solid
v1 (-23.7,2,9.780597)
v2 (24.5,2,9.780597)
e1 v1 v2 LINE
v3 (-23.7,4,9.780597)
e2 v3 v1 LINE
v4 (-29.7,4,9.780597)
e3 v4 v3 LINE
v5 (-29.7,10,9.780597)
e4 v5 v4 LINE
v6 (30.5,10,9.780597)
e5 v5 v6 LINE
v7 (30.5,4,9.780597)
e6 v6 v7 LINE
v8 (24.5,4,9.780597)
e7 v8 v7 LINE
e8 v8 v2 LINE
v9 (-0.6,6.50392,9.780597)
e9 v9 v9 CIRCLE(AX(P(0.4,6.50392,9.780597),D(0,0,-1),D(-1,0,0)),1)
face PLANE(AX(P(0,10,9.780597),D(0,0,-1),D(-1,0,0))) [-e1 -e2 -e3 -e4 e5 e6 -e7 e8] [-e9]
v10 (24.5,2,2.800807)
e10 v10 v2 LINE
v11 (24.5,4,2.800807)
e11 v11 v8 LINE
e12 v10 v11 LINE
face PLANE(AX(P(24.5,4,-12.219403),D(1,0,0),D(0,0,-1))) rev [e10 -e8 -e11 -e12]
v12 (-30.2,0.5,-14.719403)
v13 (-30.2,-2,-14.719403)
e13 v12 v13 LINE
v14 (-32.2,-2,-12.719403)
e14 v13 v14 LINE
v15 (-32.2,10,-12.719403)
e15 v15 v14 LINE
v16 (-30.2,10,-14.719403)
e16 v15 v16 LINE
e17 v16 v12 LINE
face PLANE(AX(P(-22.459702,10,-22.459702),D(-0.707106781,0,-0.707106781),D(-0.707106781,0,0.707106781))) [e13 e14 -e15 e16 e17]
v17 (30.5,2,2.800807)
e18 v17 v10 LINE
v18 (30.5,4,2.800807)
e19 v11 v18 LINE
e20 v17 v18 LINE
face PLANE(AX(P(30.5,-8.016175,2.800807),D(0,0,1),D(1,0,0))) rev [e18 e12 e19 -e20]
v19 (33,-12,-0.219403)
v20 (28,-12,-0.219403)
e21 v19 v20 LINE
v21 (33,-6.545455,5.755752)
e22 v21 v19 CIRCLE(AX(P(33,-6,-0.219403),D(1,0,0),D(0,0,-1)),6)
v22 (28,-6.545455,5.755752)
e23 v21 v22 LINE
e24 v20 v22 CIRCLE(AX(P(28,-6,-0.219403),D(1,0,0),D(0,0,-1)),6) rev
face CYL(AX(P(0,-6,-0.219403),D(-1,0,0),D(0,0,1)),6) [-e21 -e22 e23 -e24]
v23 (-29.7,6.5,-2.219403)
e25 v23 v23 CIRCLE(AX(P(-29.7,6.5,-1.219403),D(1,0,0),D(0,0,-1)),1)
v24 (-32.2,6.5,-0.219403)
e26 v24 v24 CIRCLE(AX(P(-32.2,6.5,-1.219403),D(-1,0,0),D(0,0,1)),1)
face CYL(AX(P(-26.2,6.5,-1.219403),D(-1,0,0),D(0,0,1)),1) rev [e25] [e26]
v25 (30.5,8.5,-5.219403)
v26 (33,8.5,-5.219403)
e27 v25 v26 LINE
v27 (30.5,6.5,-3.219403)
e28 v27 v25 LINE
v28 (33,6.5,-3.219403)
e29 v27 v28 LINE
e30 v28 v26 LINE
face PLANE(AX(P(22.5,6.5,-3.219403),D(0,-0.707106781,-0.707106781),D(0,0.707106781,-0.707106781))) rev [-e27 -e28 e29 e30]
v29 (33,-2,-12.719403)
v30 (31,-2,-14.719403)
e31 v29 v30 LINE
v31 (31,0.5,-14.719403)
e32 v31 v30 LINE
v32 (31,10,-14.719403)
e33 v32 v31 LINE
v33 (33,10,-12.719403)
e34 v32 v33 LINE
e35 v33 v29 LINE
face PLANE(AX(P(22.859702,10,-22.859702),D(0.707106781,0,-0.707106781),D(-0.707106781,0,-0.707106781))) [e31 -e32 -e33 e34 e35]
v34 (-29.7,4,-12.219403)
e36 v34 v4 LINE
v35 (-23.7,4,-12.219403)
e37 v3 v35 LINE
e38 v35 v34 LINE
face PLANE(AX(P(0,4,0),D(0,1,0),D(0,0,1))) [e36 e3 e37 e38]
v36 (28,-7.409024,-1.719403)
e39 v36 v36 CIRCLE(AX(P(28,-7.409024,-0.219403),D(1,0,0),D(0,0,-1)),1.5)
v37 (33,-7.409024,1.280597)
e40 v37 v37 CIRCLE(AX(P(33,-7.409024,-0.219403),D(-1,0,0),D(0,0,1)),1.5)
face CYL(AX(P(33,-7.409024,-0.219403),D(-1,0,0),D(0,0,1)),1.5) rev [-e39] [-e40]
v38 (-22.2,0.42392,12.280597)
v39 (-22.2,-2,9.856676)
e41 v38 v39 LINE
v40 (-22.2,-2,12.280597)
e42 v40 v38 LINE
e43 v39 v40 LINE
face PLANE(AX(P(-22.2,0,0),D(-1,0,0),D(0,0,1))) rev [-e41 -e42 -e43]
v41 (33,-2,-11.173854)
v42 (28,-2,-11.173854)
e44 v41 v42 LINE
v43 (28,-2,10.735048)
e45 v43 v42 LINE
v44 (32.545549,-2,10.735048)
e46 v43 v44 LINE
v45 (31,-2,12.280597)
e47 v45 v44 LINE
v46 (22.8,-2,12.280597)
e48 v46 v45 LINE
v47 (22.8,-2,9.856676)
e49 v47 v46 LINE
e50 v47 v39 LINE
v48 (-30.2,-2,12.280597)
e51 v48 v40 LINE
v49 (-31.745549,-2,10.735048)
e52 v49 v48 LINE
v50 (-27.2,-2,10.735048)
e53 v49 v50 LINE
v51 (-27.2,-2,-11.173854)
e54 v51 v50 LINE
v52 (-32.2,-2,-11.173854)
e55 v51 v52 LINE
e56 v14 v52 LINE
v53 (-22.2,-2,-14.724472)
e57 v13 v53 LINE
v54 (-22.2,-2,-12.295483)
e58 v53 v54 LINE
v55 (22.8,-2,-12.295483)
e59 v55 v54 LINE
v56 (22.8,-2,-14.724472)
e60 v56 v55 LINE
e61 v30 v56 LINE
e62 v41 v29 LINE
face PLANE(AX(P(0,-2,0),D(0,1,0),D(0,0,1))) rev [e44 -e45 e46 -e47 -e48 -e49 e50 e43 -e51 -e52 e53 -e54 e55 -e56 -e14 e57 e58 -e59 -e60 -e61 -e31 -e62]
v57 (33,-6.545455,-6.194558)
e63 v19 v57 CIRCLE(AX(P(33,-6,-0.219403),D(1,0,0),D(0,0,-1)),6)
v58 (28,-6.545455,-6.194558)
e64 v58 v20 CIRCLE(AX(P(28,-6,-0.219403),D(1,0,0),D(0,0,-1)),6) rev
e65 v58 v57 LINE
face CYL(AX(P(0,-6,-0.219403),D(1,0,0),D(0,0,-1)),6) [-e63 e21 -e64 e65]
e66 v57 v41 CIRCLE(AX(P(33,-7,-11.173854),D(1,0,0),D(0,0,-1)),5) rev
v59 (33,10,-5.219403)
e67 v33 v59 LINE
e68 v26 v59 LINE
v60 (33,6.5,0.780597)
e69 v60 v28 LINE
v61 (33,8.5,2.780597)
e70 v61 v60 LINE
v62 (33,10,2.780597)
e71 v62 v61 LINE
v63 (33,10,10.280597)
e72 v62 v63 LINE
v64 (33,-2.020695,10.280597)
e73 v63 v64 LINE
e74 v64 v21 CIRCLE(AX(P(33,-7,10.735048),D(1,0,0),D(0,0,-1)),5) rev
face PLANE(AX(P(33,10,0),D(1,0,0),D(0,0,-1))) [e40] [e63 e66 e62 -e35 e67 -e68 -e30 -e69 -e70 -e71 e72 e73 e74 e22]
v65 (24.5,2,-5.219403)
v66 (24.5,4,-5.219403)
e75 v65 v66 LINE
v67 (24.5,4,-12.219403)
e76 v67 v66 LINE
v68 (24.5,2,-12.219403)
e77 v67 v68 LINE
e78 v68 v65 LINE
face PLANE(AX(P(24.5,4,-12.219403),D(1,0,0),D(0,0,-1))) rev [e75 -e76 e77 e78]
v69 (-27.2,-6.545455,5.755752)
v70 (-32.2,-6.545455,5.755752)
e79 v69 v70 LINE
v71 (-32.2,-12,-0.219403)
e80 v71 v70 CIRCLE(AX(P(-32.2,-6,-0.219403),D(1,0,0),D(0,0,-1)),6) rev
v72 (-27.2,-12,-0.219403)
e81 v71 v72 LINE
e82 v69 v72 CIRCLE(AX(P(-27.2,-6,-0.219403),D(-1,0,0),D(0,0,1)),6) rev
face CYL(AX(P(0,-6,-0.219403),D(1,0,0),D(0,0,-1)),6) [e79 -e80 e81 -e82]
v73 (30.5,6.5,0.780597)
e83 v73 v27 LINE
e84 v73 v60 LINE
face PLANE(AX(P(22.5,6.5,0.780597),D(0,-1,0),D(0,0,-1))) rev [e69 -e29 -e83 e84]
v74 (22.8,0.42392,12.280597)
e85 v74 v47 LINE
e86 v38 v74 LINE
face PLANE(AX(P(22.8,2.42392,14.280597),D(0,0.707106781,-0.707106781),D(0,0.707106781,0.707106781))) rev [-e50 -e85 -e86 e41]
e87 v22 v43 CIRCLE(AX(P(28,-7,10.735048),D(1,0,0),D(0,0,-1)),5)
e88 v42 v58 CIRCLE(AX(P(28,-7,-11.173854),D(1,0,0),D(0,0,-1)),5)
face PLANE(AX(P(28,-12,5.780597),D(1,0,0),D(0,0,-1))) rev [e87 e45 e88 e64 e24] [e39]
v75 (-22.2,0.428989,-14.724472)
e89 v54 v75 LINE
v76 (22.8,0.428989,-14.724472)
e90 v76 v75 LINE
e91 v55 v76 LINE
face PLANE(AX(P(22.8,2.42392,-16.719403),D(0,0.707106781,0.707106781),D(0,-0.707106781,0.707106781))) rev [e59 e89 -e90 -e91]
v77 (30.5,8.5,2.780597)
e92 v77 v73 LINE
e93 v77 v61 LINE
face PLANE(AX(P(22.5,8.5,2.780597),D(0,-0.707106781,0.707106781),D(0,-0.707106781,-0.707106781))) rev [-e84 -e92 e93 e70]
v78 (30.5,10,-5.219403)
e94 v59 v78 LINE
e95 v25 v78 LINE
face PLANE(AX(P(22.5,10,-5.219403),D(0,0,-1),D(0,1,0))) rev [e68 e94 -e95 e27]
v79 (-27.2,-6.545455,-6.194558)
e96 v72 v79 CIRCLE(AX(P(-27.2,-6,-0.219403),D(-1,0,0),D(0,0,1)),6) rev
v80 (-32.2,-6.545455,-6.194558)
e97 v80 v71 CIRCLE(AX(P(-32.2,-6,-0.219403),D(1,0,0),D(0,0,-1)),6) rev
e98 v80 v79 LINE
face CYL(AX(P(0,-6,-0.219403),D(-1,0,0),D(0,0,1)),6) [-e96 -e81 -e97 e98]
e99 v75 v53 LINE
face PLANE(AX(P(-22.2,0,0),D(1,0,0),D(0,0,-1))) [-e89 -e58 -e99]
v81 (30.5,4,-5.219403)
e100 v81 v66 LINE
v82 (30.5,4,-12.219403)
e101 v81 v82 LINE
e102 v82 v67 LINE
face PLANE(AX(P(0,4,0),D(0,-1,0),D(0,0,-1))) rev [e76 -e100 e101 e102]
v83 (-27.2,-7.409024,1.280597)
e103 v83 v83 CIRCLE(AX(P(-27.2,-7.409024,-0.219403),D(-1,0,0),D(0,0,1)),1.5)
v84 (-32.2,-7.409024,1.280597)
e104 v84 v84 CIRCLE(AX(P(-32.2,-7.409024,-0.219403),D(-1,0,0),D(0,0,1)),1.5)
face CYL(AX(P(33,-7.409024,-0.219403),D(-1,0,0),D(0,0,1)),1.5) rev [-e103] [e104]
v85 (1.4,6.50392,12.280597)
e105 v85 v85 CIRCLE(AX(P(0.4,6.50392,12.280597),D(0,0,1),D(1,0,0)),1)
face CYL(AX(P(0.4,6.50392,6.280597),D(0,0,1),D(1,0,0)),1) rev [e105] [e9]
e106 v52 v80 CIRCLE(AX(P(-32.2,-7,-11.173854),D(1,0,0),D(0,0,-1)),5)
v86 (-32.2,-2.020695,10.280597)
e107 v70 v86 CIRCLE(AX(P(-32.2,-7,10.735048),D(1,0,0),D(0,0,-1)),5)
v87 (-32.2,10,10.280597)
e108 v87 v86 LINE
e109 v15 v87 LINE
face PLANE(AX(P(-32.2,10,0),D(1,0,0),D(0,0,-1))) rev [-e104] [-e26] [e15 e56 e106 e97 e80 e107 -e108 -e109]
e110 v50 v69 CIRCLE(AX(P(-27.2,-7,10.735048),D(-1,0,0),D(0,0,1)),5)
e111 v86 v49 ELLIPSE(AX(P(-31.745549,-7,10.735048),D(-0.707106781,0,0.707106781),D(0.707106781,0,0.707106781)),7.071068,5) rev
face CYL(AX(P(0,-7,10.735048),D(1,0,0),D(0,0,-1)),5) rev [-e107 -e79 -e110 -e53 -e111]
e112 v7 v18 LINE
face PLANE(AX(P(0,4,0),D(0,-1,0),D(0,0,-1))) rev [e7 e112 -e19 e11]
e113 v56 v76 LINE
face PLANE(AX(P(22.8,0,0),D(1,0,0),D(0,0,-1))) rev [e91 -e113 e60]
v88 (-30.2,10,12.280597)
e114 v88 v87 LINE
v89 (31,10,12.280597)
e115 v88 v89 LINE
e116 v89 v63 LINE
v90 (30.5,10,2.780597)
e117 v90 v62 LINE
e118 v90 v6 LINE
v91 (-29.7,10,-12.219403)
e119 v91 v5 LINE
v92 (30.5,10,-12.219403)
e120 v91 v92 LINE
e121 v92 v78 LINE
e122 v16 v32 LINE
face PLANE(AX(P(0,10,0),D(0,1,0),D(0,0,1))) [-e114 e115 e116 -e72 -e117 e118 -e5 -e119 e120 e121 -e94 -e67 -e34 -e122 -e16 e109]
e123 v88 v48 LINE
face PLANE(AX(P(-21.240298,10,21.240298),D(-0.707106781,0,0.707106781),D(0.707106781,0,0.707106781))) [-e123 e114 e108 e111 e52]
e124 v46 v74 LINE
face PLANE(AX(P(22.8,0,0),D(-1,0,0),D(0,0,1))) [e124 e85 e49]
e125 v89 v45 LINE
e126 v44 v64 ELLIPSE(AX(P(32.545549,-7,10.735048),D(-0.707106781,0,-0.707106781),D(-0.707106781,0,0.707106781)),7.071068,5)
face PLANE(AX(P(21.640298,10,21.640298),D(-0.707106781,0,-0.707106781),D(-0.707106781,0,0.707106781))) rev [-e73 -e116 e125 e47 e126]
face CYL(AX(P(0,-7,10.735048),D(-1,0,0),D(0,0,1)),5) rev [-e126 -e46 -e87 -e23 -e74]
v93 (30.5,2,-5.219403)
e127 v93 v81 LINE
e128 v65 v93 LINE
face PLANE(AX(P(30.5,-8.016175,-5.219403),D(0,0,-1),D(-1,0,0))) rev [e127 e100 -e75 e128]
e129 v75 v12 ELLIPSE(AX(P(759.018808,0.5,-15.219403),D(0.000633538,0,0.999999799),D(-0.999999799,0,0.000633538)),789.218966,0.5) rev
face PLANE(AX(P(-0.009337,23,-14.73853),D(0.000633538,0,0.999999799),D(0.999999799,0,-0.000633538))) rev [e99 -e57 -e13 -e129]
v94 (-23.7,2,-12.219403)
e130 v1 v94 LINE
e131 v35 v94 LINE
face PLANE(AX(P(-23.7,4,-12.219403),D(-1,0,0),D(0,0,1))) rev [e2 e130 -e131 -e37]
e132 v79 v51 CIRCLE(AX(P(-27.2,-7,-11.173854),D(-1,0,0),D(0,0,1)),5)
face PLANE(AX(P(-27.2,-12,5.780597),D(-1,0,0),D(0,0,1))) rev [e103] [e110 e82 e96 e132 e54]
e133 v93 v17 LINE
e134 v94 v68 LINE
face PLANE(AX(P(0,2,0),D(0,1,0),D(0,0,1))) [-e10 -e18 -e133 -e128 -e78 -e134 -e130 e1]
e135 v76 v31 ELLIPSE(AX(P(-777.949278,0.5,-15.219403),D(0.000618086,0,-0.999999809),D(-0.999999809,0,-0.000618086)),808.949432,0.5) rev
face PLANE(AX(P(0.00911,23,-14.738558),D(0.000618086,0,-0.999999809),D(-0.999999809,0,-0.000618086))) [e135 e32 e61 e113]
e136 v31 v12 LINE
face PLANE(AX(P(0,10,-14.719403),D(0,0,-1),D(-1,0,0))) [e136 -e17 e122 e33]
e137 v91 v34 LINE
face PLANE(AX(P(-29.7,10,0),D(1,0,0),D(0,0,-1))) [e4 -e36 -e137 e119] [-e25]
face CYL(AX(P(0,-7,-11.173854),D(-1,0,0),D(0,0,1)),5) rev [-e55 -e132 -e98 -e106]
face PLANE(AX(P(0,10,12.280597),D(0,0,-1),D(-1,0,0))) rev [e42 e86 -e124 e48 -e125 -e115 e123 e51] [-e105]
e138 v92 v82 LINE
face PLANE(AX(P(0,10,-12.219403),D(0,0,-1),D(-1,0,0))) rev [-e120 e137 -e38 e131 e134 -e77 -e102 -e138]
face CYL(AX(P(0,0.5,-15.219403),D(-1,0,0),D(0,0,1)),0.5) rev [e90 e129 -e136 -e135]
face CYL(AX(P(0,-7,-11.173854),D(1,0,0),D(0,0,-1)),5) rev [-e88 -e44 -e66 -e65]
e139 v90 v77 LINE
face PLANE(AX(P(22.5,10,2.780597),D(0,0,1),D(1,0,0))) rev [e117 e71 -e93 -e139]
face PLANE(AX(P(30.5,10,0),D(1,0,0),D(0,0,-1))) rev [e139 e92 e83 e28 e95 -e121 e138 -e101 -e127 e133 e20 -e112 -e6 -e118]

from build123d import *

# Parameters (mm, degrees)
SKETCH1_W                = 60.2
SKETCH1_H                = 22
BOSS_EXTRUDE1_DEPTH      = 10
SKETCH1_3_W              = 60.2
SKETCH1_3_H              = 22
BOSS_EXTRUDE2_DEPTH      = 2
SKETCH2_W                = 6
SKETCH2_H                = 22
BOSS_EXTRUDE3_DEPTH      = 2
BOSS_EXTRUDE4_DEPTH      = 2
FILLET1_R                = 0.5
CUT_EXTRUDE1_DEPTH       = 10.5
SKETCH5_W                = 5
SKETCH5_H                = 9
BOSS_EXTRUDE5_DEPTH      = 5
SKETCH7_W                = 3.5
SKETCH7_H                = 5
SKETCH7_W_2              = 2.5
CUT_EXTRUDE3_DEPTH       = 5
CUT_EXTRUDE4_REACH       = 52.1
CUT_EXTRUDE5_REACH       = 52.1
SKETCH11_R               = 1.5
CUT_EXTRUDE6_START       = -10
CUT_EXTRUDE6_DEPTH       = 45
SKETCH13_W               = 6
SKETCH13_H               = 8.020209914
CUT_EXTRUDE7_DEPTH       = 2
SKETCH19_R               = 1
CUT_EXTRUDE9_DEPTH       = 6
SKETCH20_R               = 1
CUT_EXTRUDE10_DEPTH      = 6
CUT_EXTRUDE13_DEPTH      = 23
CUT_EXTRUDE13_DEPTH_BACK = 23
SKETCH24_W               = 5
SKETCH24_H               = 12
BOSS_EXTRUDE6_DEPTH      = 10
FILLET2_R                = 6
SKETCH25_R               = 1.5
CUT_EXTRUDE14_DEPTH      = 68.910603458
FILLET3_R                = 5


# Some blends are built 0.0001 mm under size
with BuildPart() as part:
    # Sketch1 → Boss-Extrude1 (new body)
    with BuildSketch(Plane(origin=(0, 0, 0), x_dir=(1, 0, 0), z_dir=(0, 1, 0))):
        Polygon((-30.2, 14.719403234), (31, 14.719403234), (33, 12.719403234), (33, -10.280596766), (31, -12.280596766), (-30.2, -12.280596766), (-32.2, -10.280596766), (-32.2, 12.719403234), align=None)
        with Locations((0.4, 1.219403234)):
            Rectangle(SKETCH1_W, SKETCH1_H, mode=Mode.SUBTRACT)
    extrude(amount=BOSS_EXTRUDE1_DEPTH)

    # Sketch1<3> → Boss-Extrude2 (add)
    # profile 1 of 2: a face of its own
    with BuildSketch(Plane(origin=(0, 0, 0), x_dir=(1, 0, 0), z_dir=(0, 1, 0))):
        with Locations((0.4, 1.219403234)):
            Rectangle(SKETCH1_3_W, SKETCH1_3_H)
        with BuildLine():
            Line((19, 11.719403234), (19, 4.719403234))
            ThreePointArc((19, 4.719403234), (21, 2.719403234), (23, 4.719403234))
            Line((23, 4.719403234), (23, 8.719403234))
            Line((23, 8.719403234), (27.74387368, 8.719403234))
            Line((27.74387368, 8.719403234), (29, 7.463276914))
            Line((29, 7.463276914), (29, -6.35040845))
            Line((29, -6.35040845), (21, -9.280596766))
            Line((21, -9.280596766), (-19, -9.280596766))
            Line((-19, -9.280596766), (-29, -3.280596766))
            Line((-29, -3.280596766), (-29, 6.719403234))
            Line((-29, 6.719403234), (-19, 11.719403234))
            Line((-19, 11.719403234), (-10, 11.719403234))
            Line((-10, 11.719403234), (-9.484452133, 10.971768721))
            ThreePointArc((-9.484452133, 10.971768721), (-9.305293031, 10.812937389), (-9.07282975, 10.755612013))
            Line((-9.07282975, 10.755612013), (-6.967125689, 10.755612013))
            ThreePointArc((-6.967125689, 10.755612013), (-6.742443017, 10.808937974), (-6.565686023, 10.957541226))
            Line((-6.565686023, 10.957541226), (-6, 11.719403234))
            Line((-6, 11.719403234), (19, 11.719403234))
        make_face(mode=Mode.SUBTRACT)
    # profile 2 of 2: a face of its own
    with BuildSketch(Plane(origin=(0, 0, 0), x_dir=(1, 0, 0), z_dir=(0, 1, 0))):
        with BuildLine():
            ThreePointArc((19, 4.719403234), (21, 2.719403234), (23, 4.719403234))
            Line((23, 4.719403234), (23, 8.719403234))
            Line((23, 8.719403234), (27.74387368, 8.719403234))
            Line((27.74387368, 8.719403234), (29, 7.463276914))
            Line((29, 7.463276914), (29, -6.35040845))
            Line((29, -6.35040845), (21, -9.280596766))
            Line((21, -9.280596766), (-19, -9.280596766))
            Line((-19, -9.280596766), (-29, -3.280596766))
            Line((-29, -3.280596766), (-29, 6.719403234))
            Line((-29, 6.719403234), (-19, 11.719403234))
            Line((-19, 11.719403234), (-10, 11.719403234))
            Line((-10, 11.719403234), (-9.484452133, 10.971768721))
            ThreePointArc((-9.484452133, 10.971768721), (-9.305293031, 10.812937389), (-9.07282975, 10.755612013))
            Line((-9.07282975, 10.755612013), (-6.967125689, 10.755612013))
            ThreePointArc((-6.967125689, 10.755612013), (-6.742443017, 10.808937974), (-6.565686023, 10.957541226))
            Line((-6.565686023, 10.957541226), (-6, 11.719403234))
            Line((-6, 11.719403234), (19, 11.719403234))
            Line((19, 11.719403234), (19, 4.719403234))
        make_face()
    extrude(amount=BOSS_EXTRUDE2_DEPTH)

    # Sketch2 → Boss-Extrude3 (add)
    with BuildSketch(Plane(origin=(0, 2, 0), x_dir=(1, 0, 0), z_dir=(0, 1, 0))):
        with Locations((-26.7, 1.219403234)):
            Rectangle(SKETCH2_W, SKETCH2_H)
        with Locations((27.5, 1.219403234)):
            Rectangle(SKETCH2_W, SKETCH2_H)
    extrude(amount=BOSS_EXTRUDE3_DEPTH)

    # Sketch3 → Boss-Extrude4 (add)
    with BuildSketch(Plane.XZ):
        Polygon((-32.2, 14.280596766), (36, 14.280596766), (41, 9.280596766), (41, -11.719403234), (36, -16.719403234), (-32.2, -16.719403234), (-37.2, -11.719403234), (-37.2, 9.280596766), align=None)
    extrude(amount=BOSS_EXTRUDE4_DEPTH)

    # Fillet1
    fillet1_edges = [part.edges().sort_by_distance(p)[0] for p in [
        (0.4, 0, -14.719403234),
        (32, 0, -13.719403234),
    ]]
    fillet(fillet1_edges, radius=FILLET1_R)

    # Sketch4 → Cut-Extrude1 (cut)
    with BuildSketch(Plane(origin=(33, 0, 0), x_dir=(0, 0, -1), z_dir=(1, 0, 0))):
        Polygon((-2.780596766, 10), (5.219403234, 10), (5.219403234, 8.5), (3.219403234, 6.5), (-0.780596766, 6.5), (-2.780596766, 8.5), align=None)
    extrude(amount=-CUT_EXTRUDE1_DEPTH, mode=Mode.SUBTRACT)

    # Sketch5 → Boss-Extrude5 (add)
    with BuildSketch(Plane(origin=(0, 0, 0), x_dir=(-1, 0, 0), z_dir=(0, 1, 0))):
        with Locations((-35.5, 9.280596766)):
            Rectangle(SKETCH5_W, SKETCH5_H)
        with Locations((-35.5, -9.719403234)):
            Rectangle(SKETCH5_W, SKETCH5_H)
    extrude(amount=BOSS_EXTRUDE5_DEPTH)

    # Sketch7 → Cut-Extrude3 (cut)
    with BuildSketch(Plane(origin=(38, 0, 0), x_dir=(0, 0, -1), z_dir=(1, 0, 0))):
        with Locations((-12.030596766, 2.5)):
            Rectangle(SKETCH7_W, SKETCH7_H)
        with Locations((13.969403234, 2.5)):
            Rectangle(SKETCH7_W_2, SKETCH7_H)
    extrude(amount=-CUT_EXTRUDE3_DEPTH, mode=Mode.SUBTRACT)

    # Sketch10 → Cut-Extrude4 (cut, up to next)
    with BuildSketch(Plane(origin=(0, 0, -12.719403234), x_dir=(-1, 0, 0), z_dir=(0, 0, -1)), mode=Mode.PRIVATE) as cut_extrude4_sk1:
        with BuildLine():
            Line((-35.5, 5), (-38, 5))
            Line((-38, 5), (-38, 2.5))
            ThreePointArc((-38, 2.5), (-37.267766953, 4.267766953), (-35.5, 5))
        make_face()
    cut_extrude4_tool1 = extrude(cut_extrude4_sk1.sketch, amount=-CUT_EXTRUDE4_REACH, mode=Mode.PRIVATE) & part.part
    # Sketch10 → Cut-Extrude4 (cut, up to next)
    with BuildSketch(Plane(origin=(0, 0, -12.719403234), x_dir=(-1, 0, 0), z_dir=(0, 0, -1)), mode=Mode.PRIVATE) as cut_extrude4_sk2:
        with BuildLine():
            ThreePointArc((-35.5, 0), (-37.267766953, 0.732233047), (-38, 2.5))
            Line((-38, 2.5), (-38, 0))
            Line((-38, 0), (-35.5, 0))
        make_face()
    cut_extrude4_tool2 = extrude(cut_extrude4_sk2.sketch, amount=-CUT_EXTRUDE4_REACH, mode=Mode.PRIVATE) & part.part
    add(cut_extrude4_tool1.solids().sort_by_distance((37.44158, 4.44158, -12.719403))[0], mode=Mode.SUBTRACT)
    add(cut_extrude4_tool1.solids().sort_by_distance((37.44158, 4.44158, -12.719403))[1], mode=Mode.SUBTRACT)
    add(cut_extrude4_tool2.solids().sort_by_distance((37.44158, 0.55842, -12.719403))[0], mode=Mode.SUBTRACT)
    add(cut_extrude4_tool2.solids().sort_by_distance((37.44158, 0.55842, -12.719403))[1], mode=Mode.SUBTRACT)

    # Cut-Extrude5: up to this face of the body (flat: up to its plane)
    cut_extrude5_end = Plane(part.part.faces().sort_by_distance((35.266625353, 2.5, 10.280596766))[0])
    # Sketch11 → Cut-Extrude5 (cut, up to the picked face)
    with BuildSketch(Plane(origin=(0, 0, -12.719403234), x_dir=(-1, 0, 0), z_dir=(0, 0, -1)), mode=Mode.PRIVATE) as cut_extrude5_sk1:
        with Locations((-35.5, 2.5)):
            Circle(SKETCH11_R)
    cut_extrude5_tool1 = split(extrude(cut_extrude5_sk1.sketch, amount=-CUT_EXTRUDE5_REACH, mode=Mode.PRIVATE), bisect_by=cut_extrude5_end, keep=Keep.BOTH, mode=Mode.PRIVATE)
    add(cut_extrude5_tool1.solids().sort_by(Axis((35.5, 2.5, -12.719403), (0, 0, 1)))[0], mode=Mode.SUBTRACT)

    # Sketch12 → Cut-Extrude6 (cut)
    with BuildSketch(Plane.ZY.offset(32.2).offset(CUT_EXTRUDE6_START)):
        Polygon((14.280596766, -2), (14.280596766, 2.423920323), (9.856676443, -2), align=None)
        Polygon((-12.295482911, -2), (-16.719403234, -2), (-16.719403234, 2.423920323), align=None)
    extrude(amount=-CUT_EXTRUDE6_DEPTH, mode=Mode.SUBTRACT)

    # Sketch13 → Cut-Extrude7 (cut)
    with BuildSketch(Plane(origin=(0, 4, 0), x_dir=(1, 0, 0), z_dir=(0, 1, 0))):
        with Locations((27.5, 1.209298277)):
            Rectangle(SKETCH13_W, SKETCH13_H)
    extrude(amount=-CUT_EXTRUDE7_DEPTH, mode=Mode.SUBTRACT)

    # Sketch19 → Cut-Extrude9 (cut)
    with BuildSketch(Plane.ZY.offset(32.2)):
        with Locations((-1.219403234, 6.5)):
            Circle(SKETCH19_R)
    extrude(amount=-CUT_EXTRUDE9_DEPTH, mode=Mode.SUBTRACT)

    # Sketch20 → Cut-Extrude10 (cut)
    with BuildSketch(Plane.XY.offset(12.280596766)):
        with Locations((0.4, 6.503920323)):
            Circle(SKETCH20_R)
    extrude(amount=-CUT_EXTRUDE10_DEPTH, mode=Mode.SUBTRACT)

    # Sketch21 → Cut-Extrude13 (cut, two sides: drawn at the far end of the back side and taken through both)
    with BuildSketch(Plane(origin=(0, 0, 0), x_dir=(1, 0, 0), z_dir=(0, 1, 0)).offset(-CUT_EXTRUDE13_DEPTH_BACK)):
        Polygon((-32.2, -14.280596766), (-22.2, -14.280596766), (-22.2, -12.280596766), (-30.2, -12.280596766), (-32.2, -10.280596766), (-32.2, 12.719403234), (-29.7, 15.219403234), (-22.2, 15.219403234), (-22.2, 16.719403234), (-32.2, 16.719403234), (-37.2, 11.719403234), (-37.2, -9.280596766), align=None)
        Polygon((-22.2, 14.724471537), (-22.2, 15.219403234), (-29.7, 15.219403234), (-30.2, 14.719403234), align=None)
        Polygon((33, 12.719403234), (33, -10.280596766), (31, -12.280596766), (22.8, -12.280596766), (22.8, -14.280596766), (36, -14.280596766), (41, -9.280596766), (41, 11.719403234), (36, 16.719403234), (22.8, 16.719403234), (22.8, 15.219403234), (22.8, 14.724471537), (31, 14.719403234), align=None)
    extrude(amount=CUT_EXTRUDE13_DEPTH + CUT_EXTRUDE13_DEPTH_BACK, mode=Mode.SUBTRACT)

    # Sketch24 → Boss-Extrude6 (add)
    with BuildSketch(Plane.XZ.offset(2)):
        with Locations((-29.7, -0.219403234)):
            Rectangle(SKETCH24_W, SKETCH24_H)
        with Locations((30.5, -0.219403234)):
            Rectangle(SKETCH24_W, SKETCH24_H)
    extrude(amount=BOSS_EXTRUDE6_DEPTH)

    # Fillet2
    fillet2_edges = [part.edges().sort_by_distance(p)[0] for p in [
        (30.5, -12, -6.219403234),
        (30.5, -12, 5.780596766),
        (-29.7, -12, 5.780596766),
        (-29.7, -12, -6.219403234),
    ]]
    fillet(fillet2_edges, radius=FILLET2_R - 0.0001)  # a hair under: the kernel refuses the full size

    # Sketch25 → Cut-Extrude14 (cut, through all)
    with BuildSketch(Plane.ZY.offset(32.2)):
        with Locations((-0.219403234, -7.409023834)):
            Circle(SKETCH25_R)
    extrude(amount=-CUT_EXTRUDE14_DEPTH, mode=Mode.SUBTRACT)

    # Fillet3
    # the kernel refuses this fillet: 5 mm, written as the material it adds along each edge
    with BuildSketch(Plane(origin=(33, -2, 5.780596766), x_dir=(0, 0, 1), z_dir=(-1, 0, 0))) as fillet3_piece_1_section:
        with BuildLine():
            CenterArc((4.954459863, -5), FILLET3_R, 90, 84.784566921)
            Line((-0.024839887, -4.545495868), (-0.522769862, -4.500045455))
            ThreePointArc((-0.522769862, -4.500045455), (-0.5, -4.0001), (-0.5, 0))
            Line((-0.5, 0), (0, 0.5))
            Line((0, 0.5), (4.954459863, 0.5))
            Line((4.954459863, 0.5), (4.954459863, 0))
        make_face()
    fillet3_piece_1 = extrude(amount=5, mode=Mode.PRIVATE)
    fillet3_piece_1 = split(fillet3_piece_1, bisect_by=Plane(origin=(31.767986463, -2.014062206, 11.512610303), z_dir=(-0.7071067811865495, 0, -0.7071067811865457)), keep=Keep.TOP, mode=Mode.PRIVATE)
    add(fillet3_piece_1)
    with BuildSketch(Plane(origin=(-32.2, -2, 5.780596766), x_dir=(0, 0, 1), z_dir=(1, 0, 0))) as fillet3_piece_2_section:
        with BuildLine():
            CenterArc((4.954459863, 5), FILLET3_R, 185.215433079, 84.784566921)
            Line((-0.024839887, 4.545495868), (-0.522769862, 4.500045455))
            ThreePointArc((-0.522769862, 4.500045455), (-0.5, 4.0001), (-0.5, 0))
            Line((-0.5, 0), (0, -0.5))
            Line((0, -0.5), (4.954459863, -0.5))
            Line((4.954459863, -0.5), (4.954459863, 0))
        make_face()
    fillet3_piece_2 = extrude(amount=5, mode=Mode.PRIVATE)
    fillet3_piece_2 = split(fillet3_piece_2, bisect_by=Plane(origin=(-30.967986463, -2.014062206, 11.512610303), z_dir=(0.7071067811865481, 0, -0.7071067811865469)), keep=Keep.TOP, mode=Mode.PRIVATE)
    add(fillet3_piece_2)
    with BuildSketch(Plane(origin=(-27.2, -2, -6.219403234), x_dir=(0, -0.99998506872255, 0.005464643808789093), z_dir=(-1, 0, 0))) as fillet3_piece_3:
        with BuildLine():
            CenterArc((4.972850985, -4.981709105), FILLET3_R, 94.902330493, 84.784566921)
            Line((-0.027074358, -4.954385886), (-0.527066893, -4.951653564))
            Line((-0.527066893, -4.951653564), (-0.499992534, 0.002732322))
            Line((-0.499992534, 0.002732322), (0.002732322, 0.499992534))
            ThreePointArc((0.002732322, 0.499992534), (4.002772595, 0.478133413), (4.502835015, 0.498170911))
            Line((4.502835015, 0.498170911), (4.545563739, 0))
        make_face()
    extrude(amount=5)
    with BuildSketch(Plane(origin=(28, -2, -6.219403234), x_dir=(0, 0, -1), z_dir=(1, 0, 0))) as fillet3_piece_4:
        with BuildLine():
            CenterArc((4.954459863, -5), FILLET3_R, 90, 84.784566921)
            Line((-0.024839887, -4.545495868), (-0.522769862, -4.500045455))
            ThreePointArc((-0.522769862, -4.500045455), (-0.5, -4.0001), (-0.5, 0))
            Line((-0.5, 0), (0, 0.5))
            Line((0, 0.5), (4.954459863, 0.5))
            Line((4.954459863, 0.5), (4.954459863, 0))
        make_face()
    extrude(amount=5)


solid = part.part
